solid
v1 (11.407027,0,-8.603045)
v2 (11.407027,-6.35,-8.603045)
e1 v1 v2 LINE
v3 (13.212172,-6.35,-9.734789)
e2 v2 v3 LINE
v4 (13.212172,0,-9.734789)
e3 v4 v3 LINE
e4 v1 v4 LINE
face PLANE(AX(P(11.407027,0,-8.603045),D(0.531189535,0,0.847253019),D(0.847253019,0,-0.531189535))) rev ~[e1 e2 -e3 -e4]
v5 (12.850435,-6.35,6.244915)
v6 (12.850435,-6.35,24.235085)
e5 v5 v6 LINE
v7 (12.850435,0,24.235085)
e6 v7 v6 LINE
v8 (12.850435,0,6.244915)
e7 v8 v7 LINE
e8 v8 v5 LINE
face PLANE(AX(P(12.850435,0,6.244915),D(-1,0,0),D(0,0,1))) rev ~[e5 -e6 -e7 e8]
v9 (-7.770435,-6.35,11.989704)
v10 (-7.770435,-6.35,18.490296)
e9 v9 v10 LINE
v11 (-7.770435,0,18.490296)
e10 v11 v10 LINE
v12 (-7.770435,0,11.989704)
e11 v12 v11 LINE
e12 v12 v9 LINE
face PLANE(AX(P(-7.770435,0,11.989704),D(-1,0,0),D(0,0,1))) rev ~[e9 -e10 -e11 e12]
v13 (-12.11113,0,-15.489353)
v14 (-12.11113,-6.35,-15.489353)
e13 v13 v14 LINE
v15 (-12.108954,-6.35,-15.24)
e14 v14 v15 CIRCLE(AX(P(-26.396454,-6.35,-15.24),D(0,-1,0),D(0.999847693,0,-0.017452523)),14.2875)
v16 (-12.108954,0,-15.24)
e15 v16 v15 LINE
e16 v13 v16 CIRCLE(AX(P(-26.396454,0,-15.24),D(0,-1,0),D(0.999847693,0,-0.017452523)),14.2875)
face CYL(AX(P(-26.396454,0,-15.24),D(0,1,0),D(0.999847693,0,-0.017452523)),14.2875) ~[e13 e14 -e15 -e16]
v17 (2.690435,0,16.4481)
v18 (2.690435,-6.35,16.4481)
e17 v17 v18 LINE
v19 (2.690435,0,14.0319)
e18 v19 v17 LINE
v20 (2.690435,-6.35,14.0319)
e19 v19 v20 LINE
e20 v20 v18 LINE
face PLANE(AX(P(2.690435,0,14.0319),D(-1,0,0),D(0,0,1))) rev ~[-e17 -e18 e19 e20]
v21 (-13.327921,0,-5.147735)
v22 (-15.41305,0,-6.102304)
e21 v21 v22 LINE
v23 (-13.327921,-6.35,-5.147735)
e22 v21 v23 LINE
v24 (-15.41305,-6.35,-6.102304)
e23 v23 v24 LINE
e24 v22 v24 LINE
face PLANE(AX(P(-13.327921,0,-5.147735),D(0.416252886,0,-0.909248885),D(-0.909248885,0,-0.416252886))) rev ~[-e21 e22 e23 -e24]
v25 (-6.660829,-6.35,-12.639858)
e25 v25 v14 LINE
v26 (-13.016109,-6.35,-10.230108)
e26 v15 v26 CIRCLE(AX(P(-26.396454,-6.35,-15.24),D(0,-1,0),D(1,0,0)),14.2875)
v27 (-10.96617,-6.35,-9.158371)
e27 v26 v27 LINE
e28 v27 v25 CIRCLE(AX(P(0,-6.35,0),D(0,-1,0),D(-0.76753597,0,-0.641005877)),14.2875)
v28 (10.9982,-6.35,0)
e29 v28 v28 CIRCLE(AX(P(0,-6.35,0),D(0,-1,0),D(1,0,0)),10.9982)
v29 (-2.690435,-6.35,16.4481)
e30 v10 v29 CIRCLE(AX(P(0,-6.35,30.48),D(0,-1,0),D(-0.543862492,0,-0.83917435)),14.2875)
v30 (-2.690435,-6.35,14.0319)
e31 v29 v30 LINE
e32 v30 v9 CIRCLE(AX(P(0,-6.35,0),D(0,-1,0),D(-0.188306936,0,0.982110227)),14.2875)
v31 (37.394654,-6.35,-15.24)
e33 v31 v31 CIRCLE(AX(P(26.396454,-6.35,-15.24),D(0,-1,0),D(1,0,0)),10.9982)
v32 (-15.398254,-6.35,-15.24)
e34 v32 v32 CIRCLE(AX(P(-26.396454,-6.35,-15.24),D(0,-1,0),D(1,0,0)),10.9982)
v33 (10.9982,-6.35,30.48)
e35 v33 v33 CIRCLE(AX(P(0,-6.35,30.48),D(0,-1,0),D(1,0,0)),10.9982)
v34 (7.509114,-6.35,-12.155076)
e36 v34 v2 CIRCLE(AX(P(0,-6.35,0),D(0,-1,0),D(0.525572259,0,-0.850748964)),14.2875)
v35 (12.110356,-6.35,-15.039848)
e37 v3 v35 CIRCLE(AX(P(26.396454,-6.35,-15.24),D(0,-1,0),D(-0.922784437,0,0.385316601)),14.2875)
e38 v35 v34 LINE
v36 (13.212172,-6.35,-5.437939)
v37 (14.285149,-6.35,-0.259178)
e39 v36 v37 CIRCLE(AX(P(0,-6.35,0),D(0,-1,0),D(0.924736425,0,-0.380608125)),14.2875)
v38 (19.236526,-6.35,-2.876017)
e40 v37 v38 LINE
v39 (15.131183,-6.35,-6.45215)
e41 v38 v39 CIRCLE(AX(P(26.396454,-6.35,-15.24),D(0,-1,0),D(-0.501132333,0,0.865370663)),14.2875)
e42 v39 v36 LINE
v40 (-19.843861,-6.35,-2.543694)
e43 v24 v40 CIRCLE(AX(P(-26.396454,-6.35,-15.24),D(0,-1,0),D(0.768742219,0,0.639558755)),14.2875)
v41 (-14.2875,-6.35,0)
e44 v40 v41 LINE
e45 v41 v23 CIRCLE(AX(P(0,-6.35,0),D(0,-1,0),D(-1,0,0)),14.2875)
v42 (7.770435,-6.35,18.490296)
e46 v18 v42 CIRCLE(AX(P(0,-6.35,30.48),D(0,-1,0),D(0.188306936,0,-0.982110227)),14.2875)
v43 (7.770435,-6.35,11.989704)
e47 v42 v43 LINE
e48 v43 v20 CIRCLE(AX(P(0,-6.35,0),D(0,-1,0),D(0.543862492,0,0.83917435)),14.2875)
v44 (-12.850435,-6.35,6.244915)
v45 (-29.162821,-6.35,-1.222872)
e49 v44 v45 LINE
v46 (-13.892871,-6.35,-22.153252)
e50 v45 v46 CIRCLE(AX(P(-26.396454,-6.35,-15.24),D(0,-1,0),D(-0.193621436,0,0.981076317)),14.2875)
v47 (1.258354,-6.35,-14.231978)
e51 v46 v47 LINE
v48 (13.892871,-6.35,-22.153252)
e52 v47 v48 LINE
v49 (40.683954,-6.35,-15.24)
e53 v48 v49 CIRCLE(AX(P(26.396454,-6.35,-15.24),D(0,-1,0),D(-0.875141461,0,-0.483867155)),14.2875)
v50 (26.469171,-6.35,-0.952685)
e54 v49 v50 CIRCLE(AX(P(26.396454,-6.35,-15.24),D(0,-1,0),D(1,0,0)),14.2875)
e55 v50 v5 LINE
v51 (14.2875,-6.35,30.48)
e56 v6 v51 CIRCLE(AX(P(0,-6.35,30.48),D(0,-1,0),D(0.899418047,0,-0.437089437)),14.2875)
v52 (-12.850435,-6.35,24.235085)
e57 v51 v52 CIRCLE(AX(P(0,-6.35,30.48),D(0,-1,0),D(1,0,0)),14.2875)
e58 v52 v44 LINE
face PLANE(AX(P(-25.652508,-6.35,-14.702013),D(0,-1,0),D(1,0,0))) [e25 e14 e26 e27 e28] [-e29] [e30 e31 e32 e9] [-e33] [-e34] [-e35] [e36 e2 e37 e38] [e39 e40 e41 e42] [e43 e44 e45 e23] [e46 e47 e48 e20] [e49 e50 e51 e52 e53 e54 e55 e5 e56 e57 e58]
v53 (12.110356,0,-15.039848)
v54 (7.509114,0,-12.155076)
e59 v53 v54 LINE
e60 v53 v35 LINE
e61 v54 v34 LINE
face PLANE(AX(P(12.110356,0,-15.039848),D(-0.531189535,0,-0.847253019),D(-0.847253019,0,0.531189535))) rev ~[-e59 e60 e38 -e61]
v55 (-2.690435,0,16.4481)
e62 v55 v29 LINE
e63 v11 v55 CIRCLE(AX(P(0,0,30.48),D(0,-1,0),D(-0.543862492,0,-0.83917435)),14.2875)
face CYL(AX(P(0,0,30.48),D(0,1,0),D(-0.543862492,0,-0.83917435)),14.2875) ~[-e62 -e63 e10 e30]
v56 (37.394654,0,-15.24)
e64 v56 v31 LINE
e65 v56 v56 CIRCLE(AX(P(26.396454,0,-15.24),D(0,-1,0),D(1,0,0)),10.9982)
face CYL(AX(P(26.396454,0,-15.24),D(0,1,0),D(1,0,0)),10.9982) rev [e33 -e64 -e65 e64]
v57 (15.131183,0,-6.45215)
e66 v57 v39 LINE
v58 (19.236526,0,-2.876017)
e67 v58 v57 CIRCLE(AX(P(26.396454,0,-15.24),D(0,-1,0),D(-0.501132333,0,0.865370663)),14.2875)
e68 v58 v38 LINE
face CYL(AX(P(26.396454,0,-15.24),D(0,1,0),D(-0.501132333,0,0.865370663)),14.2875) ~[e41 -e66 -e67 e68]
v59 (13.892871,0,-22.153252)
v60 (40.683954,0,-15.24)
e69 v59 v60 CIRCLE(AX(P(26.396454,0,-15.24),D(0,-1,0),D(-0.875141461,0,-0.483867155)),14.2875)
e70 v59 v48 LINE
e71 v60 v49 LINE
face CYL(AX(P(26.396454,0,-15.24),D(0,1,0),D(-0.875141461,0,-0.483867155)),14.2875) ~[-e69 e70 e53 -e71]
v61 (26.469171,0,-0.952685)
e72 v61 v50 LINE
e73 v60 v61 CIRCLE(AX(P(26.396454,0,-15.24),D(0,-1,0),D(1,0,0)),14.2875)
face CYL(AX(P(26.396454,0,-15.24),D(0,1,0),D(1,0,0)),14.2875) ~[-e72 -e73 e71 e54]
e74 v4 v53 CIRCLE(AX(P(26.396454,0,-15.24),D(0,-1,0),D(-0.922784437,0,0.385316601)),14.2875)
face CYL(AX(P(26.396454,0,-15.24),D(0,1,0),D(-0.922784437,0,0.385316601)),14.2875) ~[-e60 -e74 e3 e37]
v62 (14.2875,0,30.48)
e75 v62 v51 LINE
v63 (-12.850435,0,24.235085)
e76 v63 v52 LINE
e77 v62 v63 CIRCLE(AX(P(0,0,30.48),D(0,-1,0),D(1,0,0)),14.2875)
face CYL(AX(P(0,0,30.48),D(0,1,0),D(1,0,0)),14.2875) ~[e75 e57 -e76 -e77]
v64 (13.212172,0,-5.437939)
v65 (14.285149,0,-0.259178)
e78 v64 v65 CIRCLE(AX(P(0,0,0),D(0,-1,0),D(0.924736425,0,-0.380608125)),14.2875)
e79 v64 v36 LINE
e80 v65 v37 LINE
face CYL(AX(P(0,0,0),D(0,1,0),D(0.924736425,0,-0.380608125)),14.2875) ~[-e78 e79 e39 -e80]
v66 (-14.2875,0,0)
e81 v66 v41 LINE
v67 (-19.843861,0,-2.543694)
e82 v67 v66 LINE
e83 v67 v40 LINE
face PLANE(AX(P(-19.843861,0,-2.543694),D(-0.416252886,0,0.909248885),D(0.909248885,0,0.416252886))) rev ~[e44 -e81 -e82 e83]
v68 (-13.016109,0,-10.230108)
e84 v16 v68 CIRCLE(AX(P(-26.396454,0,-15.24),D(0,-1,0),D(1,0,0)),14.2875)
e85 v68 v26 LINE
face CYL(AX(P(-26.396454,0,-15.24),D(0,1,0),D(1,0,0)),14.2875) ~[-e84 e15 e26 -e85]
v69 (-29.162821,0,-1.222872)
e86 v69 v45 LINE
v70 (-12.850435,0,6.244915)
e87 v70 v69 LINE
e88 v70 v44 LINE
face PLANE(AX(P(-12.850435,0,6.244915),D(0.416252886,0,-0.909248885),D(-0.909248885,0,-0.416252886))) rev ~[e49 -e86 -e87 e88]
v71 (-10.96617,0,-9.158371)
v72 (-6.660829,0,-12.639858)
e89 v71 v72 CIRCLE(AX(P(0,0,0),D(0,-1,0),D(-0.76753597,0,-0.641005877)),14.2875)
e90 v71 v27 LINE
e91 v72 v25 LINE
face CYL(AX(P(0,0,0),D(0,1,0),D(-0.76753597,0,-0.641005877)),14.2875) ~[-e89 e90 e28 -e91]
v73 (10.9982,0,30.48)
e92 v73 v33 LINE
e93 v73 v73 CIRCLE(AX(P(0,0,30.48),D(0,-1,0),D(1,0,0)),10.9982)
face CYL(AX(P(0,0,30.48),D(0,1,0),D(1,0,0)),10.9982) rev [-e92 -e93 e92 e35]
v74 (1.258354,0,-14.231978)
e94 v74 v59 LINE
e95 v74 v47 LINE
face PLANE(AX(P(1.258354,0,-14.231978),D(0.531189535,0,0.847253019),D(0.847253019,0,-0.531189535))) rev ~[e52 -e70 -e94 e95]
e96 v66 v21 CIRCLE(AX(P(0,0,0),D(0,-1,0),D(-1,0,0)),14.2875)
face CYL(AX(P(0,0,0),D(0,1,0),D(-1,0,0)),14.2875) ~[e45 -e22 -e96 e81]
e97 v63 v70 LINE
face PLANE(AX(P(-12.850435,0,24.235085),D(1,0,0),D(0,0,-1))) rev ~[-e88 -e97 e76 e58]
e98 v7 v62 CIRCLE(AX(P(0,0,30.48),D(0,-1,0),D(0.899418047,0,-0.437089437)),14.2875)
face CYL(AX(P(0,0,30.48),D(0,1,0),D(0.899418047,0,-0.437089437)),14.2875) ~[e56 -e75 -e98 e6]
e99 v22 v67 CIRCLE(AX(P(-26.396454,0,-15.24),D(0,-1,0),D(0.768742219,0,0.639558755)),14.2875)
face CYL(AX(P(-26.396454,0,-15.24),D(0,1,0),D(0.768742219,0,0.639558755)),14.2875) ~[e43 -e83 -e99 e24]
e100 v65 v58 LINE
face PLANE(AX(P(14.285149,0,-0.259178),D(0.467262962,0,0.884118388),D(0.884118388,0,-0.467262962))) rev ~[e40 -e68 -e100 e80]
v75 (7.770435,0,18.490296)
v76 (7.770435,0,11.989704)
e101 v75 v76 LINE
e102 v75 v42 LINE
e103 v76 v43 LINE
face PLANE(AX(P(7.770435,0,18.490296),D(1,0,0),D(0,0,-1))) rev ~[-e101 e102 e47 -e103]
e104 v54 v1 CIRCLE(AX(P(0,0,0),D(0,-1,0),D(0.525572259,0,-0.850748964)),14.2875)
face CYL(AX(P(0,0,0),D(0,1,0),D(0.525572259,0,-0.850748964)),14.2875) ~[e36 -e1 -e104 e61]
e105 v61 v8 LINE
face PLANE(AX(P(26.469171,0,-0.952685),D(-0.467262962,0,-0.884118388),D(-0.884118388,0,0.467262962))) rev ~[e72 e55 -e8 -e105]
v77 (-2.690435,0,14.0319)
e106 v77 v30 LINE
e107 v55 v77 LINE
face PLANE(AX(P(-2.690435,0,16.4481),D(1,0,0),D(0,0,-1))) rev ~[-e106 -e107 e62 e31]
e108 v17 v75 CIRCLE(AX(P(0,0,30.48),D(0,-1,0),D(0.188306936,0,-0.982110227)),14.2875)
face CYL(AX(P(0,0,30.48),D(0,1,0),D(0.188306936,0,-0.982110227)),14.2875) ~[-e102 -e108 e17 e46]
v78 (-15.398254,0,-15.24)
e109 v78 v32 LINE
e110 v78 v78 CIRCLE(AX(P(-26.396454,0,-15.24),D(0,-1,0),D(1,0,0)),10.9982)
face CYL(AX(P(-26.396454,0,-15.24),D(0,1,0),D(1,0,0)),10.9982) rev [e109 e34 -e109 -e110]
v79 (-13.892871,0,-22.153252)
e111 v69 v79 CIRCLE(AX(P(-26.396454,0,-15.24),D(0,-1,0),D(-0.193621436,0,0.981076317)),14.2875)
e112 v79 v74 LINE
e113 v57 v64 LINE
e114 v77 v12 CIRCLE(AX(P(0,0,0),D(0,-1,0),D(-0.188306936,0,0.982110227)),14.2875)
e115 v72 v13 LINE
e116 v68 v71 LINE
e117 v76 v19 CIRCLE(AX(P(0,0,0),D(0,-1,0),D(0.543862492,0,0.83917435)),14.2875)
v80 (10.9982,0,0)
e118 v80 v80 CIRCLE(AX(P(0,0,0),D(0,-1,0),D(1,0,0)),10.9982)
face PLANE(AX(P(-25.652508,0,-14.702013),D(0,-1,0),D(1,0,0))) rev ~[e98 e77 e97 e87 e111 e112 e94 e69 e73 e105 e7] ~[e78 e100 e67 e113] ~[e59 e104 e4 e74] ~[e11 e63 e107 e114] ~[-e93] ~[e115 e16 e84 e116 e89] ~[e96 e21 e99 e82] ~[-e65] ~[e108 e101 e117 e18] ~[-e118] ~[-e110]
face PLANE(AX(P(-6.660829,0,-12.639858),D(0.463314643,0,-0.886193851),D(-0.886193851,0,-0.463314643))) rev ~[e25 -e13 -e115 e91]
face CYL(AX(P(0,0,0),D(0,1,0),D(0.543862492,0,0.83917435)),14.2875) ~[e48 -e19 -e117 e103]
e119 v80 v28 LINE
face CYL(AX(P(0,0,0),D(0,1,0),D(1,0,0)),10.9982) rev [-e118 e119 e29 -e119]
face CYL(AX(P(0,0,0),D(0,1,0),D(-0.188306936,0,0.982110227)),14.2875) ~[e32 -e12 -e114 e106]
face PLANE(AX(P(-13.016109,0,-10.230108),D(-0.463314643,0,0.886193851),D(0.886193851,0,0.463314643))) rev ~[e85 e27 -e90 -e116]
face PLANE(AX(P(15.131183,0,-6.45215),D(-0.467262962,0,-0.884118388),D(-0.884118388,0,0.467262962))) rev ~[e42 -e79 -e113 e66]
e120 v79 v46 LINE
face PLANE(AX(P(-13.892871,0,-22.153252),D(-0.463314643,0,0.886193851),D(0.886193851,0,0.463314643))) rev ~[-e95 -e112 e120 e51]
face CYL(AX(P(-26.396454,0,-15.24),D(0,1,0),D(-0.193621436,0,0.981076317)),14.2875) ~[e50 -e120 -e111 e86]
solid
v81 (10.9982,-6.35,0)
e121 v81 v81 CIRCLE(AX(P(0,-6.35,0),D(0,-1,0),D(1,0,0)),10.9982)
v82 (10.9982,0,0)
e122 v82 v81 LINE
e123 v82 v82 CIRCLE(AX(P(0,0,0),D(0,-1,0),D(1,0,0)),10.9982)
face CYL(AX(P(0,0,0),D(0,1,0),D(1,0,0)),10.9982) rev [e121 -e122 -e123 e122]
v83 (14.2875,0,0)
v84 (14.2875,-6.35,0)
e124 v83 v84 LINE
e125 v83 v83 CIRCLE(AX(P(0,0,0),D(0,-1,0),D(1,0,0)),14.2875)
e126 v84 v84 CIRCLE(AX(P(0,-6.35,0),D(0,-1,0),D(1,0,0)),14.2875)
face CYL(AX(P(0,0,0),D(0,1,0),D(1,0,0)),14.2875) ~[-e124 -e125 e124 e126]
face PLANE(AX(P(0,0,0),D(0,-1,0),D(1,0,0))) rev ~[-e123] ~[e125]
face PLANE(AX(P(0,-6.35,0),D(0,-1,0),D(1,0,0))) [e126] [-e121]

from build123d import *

# Parameters (mm, degrees)
F1_R     = 10.9982
F2_DEPTH = 6.35
F0_R     = 14.2875
F0_R_2   = 10.9982


# Not quite as in the source:
# - a feature names something its author has since deleted; it is built from what else it names


with BuildPart() as f2:
    # F1 (on Front) → F2 (new body)
    with BuildSketch(Plane.XZ):
        with BuildLine():
            ThreePointArc((-19.843860944, -2.5436943773), (-24.3914551143, -1.0938827063), (-29.162820574, -1.2228721227))
            ThreePointArc((-29.162820574, -1.2228721227), (-37.9387049837, -23.660754454), (-13.8928706881, -22.1532519791))
            ThreePointArc((-13.8928706881, -22.1532519791), (-12.5937995119, -18.9304439908), (-12.1111303918, -15.4893529181))
            ThreePointArc((-12.1111303918, -15.4893529181), (-12.1094983388, -15.3646812066), (-12.1089543073, -15.24))
            ThreePointArc((-12.1089543073, -15.24), (-12.3375720505, -12.6943201423), (-13.0161089443, -10.2301083629))
            ThreePointArc((-13.0161089443, -10.2301083629), (-14.0409790879, -8.0653997775), (-15.4130498534, -6.102304292))
            ThreePointArc((-15.4130498534, -6.102304292), (-17.4497380945, -4.100479128), (-19.843860944, -2.5436943773))
        make_face()
        with Locations((-26.3964543073, -15.24)):
            Circle(F1_R, mode=Mode.SUBTRACT)
        with BuildLine():
            ThreePointArc((12.8504353504, 24.2350846639), (13.9235995942, 27.2759353017), (14.2875, 30.48))
            ThreePointArc((14.2875, 30.48), (-3.2040646983, 44.4035995942), (-12.8504353504, 24.2350846639))
            ThreePointArc((-12.8504353504, 24.2350846639), (-10.7030708192, 21.0154909641), (-7.7704353504, 18.4902964709))
            ThreePointArc((-7.7704353504, 18.4902964709), (-5.3291739909, 17.2235841637), (-2.6904353504, 16.4481001331))
            ThreePointArc((-2.6904353504, 16.4481001331), (0, 16.1925), (2.6904353504, 16.4481001331))
            ThreePointArc((2.6904353504, 16.4481001331), (5.3291739909, 17.2235841637), (7.7704353504, 18.4902964709))
            ThreePointArc((7.7704353504, 18.4902964709), (10.7030708192, 21.0154909641), (12.8504353504, 24.2350846639))
        make_face()
        with Locations((0, 30.48)):
            Circle(F1_R, mode=Mode.SUBTRACT)
        with BuildLine():
            ThreePointArc((40.6839543073, -15.24), (36.5249191169, -5.162953962), (26.4691711959, -0.9526850492))
            ThreePointArc((26.4691711959, -0.9526850492), (22.7246778763, -1.4323675422), (19.2365261049, -2.8760166457))
            ThreePointArc((19.2365261049, -2.8760166457), (17.011936244, -4.4667239445), (15.1311826772, -6.452149788))
            ThreePointArc((15.1311826772, -6.452149788), (14.0619860916, -8.0293446841), (13.2121716662, -9.7347890605))
            ThreePointArc((13.2121716662, -9.7347890605), (12.4074813108, -12.3346100515), (12.1103563293, -15.039848026))
            ThreePointArc((12.1103563293, -15.039848026), (12.5374540198, -18.7128615405), (13.8928706881, -22.1532519791))
            ThreePointArc((13.8928706881, -22.1532519791), (29.9663076159, -29.0743342306), (40.6839543073, -15.24))
        make_face()
        with Locations((26.3964543073, -15.24)):
            Circle(F1_R, mode=Mode.SUBTRACT)
        with BuildLine():
            ThreePointArc((-7.7704353504, 11.9897035291), (-10.7030708192, 9.4645090359), (-12.8504353504, 6.2449153361))
            ThreePointArc((-12.8504353504, 6.2449153361), (-13.9235995942, 3.2040646983), (-14.2875, 0))
            ThreePointArc((-14.2875, 0), (-14.0455567318, -2.6182040304), (-13.3279210191, -5.1477351873))
            ThreePointArc((-13.3279210191, -5.1477351873), (-12.3114587928, -7.2498716295), (-10.9661701776, -9.1583714647))
            ThreePointArc((-10.9661701776, -9.1583714647), (-8.9837608827, -11.109666811), (-6.6608286535, -12.6398583021))
            ThreePointArc((-6.6608286535, -12.6398583021), (-2.8160957214, -14.0072217494), (1.2583537723, -14.231978149))
            ThreePointArc((1.2583537723, -14.231978149), (4.5050529518, -13.5586560599), (7.5091136575, -12.1550758257))
            ThreePointArc((7.5091136575, -12.1550758257), (9.623374139, -10.5604605218), (11.4070274702, -8.6030448415))
            ThreePointArc((11.4070274702, -8.6030448415), (12.4109111642, -7.0782724111), (13.2121716662, -5.4379385904))
            ThreePointArc((13.2121716662, -5.4379385904), (13.9903735339, -2.8986384098), (14.2851490362, -0.2591780564))
            ThreePointArc((14.2851490362, -0.2591780564), (14.2869122469, -0.1295943594), (14.2875, 0))
            ThreePointArc((14.2875, 0), (13.9235995942, 3.2040646983), (12.8504353504, 6.2449153361))
            ThreePointArc((12.8504353504, 6.2449153361), (10.7030708192, 9.4645090359), (7.7704353504, 11.9897035291))
            ThreePointArc((7.7704353504, 11.9897035291), (5.3291739909, 13.2564158363), (2.6904353504, 14.0318998669))
            ThreePointArc((2.6904353504, 14.0318998669), (0, 14.2875), (-2.6904353504, 14.0318998669))
            ThreePointArc((-2.6904353504, 14.0318998669), (-5.3291739909, 13.2564158363), (-7.7704353504, 11.9897035291))
        make_face()
        Circle(F1_R, mode=Mode.SUBTRACT)
        with BuildLine():
            ThreePointArc((-7.7704353504, 18.4902964709), (-10.7030708192, 21.0154909641), (-12.8504353504, 24.2350846639))
            Line((-12.8504353504, 24.2350846639), (-12.8504353504, 6.2449153361))
            ThreePointArc((-12.8504353504, 6.2449153361), (-10.7030708192, 9.4645090359), (-7.7704353504, 11.9897035291))
            Line((-7.7704353504, 11.9897035291), (-7.7704353504, 18.4902964709))
        make_face()
        with BuildLine():
            Line((12.8504353504, 6.2449153361), (12.8504353504, 24.2350846639))
            ThreePointArc((12.8504353504, 24.2350846639), (10.7030708192, 21.0154909641), (7.7704353504, 18.4902964709))
            Line((7.7704353504, 18.4902964709), (7.7704353504, 11.9897035291))
            ThreePointArc((7.7704353504, 11.9897035291), (10.7030708192, 9.4645090359), (12.8504353504, 6.2449153361))
        make_face()
        with BuildLine():
            ThreePointArc((7.5091136575, -12.1550758257), (4.5050529518, -13.5586560599), (1.2583537723, -14.231978149))
            Line((1.2583537723, -14.231978149), (13.8928706881, -22.1532519791))
            ThreePointArc((13.8928706881, -22.1532519791), (12.5374540198, -18.7128615405), (12.1103563293, -15.039848026))
            Line((12.1103563293, -15.039848026), (7.5091136575, -12.1550758257))
        make_face()
        with BuildLine():
            ThreePointArc((-12.1111303918, -15.4893529181), (-12.5937995119, -18.9304439908), (-13.8928706881, -22.1532519791))
            Line((-13.8928706881, -22.1532519791), (1.2583537723, -14.231978149))
            ThreePointArc((1.2583537723, -14.231978149), (-2.8160957214, -14.0072217494), (-6.6608286535, -12.6398583021))
            Line((-6.6608286535, -12.6398583021), (-12.1111303918, -15.4893529181))
        make_face()
        with BuildLine():
            ThreePointArc((-14.2875, 0), (-13.9235995942, 3.2040646983), (-12.8504353504, 6.2449153361))
            Line((-12.8504353504, 6.2449153361), (-29.162820574, -1.2228721227))
            ThreePointArc((-29.162820574, -1.2228721227), (-24.3914551143, -1.0938827063), (-19.843860944, -2.5436943773))
            Line((-19.843860944, -2.5436943773), (-14.2875, 0))
        make_face()
        with BuildLine():
            ThreePointArc((-10.9661701776, -9.1583714647), (-12.3114587928, -7.2498716295), (-13.3279210191, -5.1477351873))
            Line((-13.3279210191, -5.1477351873), (-15.4130498534, -6.102304292))
            ThreePointArc((-15.4130498534, -6.102304292), (-14.0409790879, -8.0653997775), (-13.0161089443, -10.2301083629))
            Line((-13.0161089443, -10.2301083629), (-10.9661701776, -9.1583714647))
        make_face()
        with BuildLine():
            ThreePointArc((2.6904353504, 16.4481001331), (0, 16.1925), (-2.6904353504, 16.4481001331))
            Line((-2.6904353504, 16.4481001331), (-2.6904353504, 14.0318998669))
            ThreePointArc((-2.6904353504, 14.0318998669), (0, 14.2875), (2.6904353504, 14.0318998669))
            Line((2.6904353504, 14.0318998669), (2.6904353504, 16.4481001331))
        make_face()
        with BuildLine():
            Line((26.4691711959, -0.9526850492), (12.8504353504, 6.2449153361))
            ThreePointArc((12.8504353504, 6.2449153361), (13.9235995942, 3.2040646983), (14.2875, 0))
            ThreePointArc((14.2875, 0), (14.2869122469, -0.1295943594), (14.2851490362, -0.2591780564))
            Line((14.2851490362, -0.2591780564), (19.2365261049, -2.8760166457))
            ThreePointArc((19.2365261049, -2.8760166457), (22.7246778763, -1.4323675422), (26.4691711959, -0.9526850492))
        make_face()
        with BuildLine():
            Line((15.1311826772, -6.452149788), (13.2121716662, -5.4379385904))
            ThreePointArc((13.2121716662, -5.4379385904), (12.4109111642, -7.0782724111), (11.4070274702, -8.6030448415))
            Line((11.4070274702, -8.6030448415), (13.2121716662, -9.7347890605))
            ThreePointArc((13.2121716662, -9.7347890605), (14.0619860916, -8.0293446841), (15.1311826772, -6.452149788))
        make_face()
    extrude(amount=F2_DEPTH)


with BuildPart() as f2b:
    # F0 (on Front) → F2, piece 2 (new body)
    with BuildSketch(Plane.XZ):
        Circle(F0_R)
        Circle(F0_R_2, mode=Mode.SUBTRACT)
    extrude(amount=F2_DEPTH)


solid = Compound([f2.part, f2b.part])
